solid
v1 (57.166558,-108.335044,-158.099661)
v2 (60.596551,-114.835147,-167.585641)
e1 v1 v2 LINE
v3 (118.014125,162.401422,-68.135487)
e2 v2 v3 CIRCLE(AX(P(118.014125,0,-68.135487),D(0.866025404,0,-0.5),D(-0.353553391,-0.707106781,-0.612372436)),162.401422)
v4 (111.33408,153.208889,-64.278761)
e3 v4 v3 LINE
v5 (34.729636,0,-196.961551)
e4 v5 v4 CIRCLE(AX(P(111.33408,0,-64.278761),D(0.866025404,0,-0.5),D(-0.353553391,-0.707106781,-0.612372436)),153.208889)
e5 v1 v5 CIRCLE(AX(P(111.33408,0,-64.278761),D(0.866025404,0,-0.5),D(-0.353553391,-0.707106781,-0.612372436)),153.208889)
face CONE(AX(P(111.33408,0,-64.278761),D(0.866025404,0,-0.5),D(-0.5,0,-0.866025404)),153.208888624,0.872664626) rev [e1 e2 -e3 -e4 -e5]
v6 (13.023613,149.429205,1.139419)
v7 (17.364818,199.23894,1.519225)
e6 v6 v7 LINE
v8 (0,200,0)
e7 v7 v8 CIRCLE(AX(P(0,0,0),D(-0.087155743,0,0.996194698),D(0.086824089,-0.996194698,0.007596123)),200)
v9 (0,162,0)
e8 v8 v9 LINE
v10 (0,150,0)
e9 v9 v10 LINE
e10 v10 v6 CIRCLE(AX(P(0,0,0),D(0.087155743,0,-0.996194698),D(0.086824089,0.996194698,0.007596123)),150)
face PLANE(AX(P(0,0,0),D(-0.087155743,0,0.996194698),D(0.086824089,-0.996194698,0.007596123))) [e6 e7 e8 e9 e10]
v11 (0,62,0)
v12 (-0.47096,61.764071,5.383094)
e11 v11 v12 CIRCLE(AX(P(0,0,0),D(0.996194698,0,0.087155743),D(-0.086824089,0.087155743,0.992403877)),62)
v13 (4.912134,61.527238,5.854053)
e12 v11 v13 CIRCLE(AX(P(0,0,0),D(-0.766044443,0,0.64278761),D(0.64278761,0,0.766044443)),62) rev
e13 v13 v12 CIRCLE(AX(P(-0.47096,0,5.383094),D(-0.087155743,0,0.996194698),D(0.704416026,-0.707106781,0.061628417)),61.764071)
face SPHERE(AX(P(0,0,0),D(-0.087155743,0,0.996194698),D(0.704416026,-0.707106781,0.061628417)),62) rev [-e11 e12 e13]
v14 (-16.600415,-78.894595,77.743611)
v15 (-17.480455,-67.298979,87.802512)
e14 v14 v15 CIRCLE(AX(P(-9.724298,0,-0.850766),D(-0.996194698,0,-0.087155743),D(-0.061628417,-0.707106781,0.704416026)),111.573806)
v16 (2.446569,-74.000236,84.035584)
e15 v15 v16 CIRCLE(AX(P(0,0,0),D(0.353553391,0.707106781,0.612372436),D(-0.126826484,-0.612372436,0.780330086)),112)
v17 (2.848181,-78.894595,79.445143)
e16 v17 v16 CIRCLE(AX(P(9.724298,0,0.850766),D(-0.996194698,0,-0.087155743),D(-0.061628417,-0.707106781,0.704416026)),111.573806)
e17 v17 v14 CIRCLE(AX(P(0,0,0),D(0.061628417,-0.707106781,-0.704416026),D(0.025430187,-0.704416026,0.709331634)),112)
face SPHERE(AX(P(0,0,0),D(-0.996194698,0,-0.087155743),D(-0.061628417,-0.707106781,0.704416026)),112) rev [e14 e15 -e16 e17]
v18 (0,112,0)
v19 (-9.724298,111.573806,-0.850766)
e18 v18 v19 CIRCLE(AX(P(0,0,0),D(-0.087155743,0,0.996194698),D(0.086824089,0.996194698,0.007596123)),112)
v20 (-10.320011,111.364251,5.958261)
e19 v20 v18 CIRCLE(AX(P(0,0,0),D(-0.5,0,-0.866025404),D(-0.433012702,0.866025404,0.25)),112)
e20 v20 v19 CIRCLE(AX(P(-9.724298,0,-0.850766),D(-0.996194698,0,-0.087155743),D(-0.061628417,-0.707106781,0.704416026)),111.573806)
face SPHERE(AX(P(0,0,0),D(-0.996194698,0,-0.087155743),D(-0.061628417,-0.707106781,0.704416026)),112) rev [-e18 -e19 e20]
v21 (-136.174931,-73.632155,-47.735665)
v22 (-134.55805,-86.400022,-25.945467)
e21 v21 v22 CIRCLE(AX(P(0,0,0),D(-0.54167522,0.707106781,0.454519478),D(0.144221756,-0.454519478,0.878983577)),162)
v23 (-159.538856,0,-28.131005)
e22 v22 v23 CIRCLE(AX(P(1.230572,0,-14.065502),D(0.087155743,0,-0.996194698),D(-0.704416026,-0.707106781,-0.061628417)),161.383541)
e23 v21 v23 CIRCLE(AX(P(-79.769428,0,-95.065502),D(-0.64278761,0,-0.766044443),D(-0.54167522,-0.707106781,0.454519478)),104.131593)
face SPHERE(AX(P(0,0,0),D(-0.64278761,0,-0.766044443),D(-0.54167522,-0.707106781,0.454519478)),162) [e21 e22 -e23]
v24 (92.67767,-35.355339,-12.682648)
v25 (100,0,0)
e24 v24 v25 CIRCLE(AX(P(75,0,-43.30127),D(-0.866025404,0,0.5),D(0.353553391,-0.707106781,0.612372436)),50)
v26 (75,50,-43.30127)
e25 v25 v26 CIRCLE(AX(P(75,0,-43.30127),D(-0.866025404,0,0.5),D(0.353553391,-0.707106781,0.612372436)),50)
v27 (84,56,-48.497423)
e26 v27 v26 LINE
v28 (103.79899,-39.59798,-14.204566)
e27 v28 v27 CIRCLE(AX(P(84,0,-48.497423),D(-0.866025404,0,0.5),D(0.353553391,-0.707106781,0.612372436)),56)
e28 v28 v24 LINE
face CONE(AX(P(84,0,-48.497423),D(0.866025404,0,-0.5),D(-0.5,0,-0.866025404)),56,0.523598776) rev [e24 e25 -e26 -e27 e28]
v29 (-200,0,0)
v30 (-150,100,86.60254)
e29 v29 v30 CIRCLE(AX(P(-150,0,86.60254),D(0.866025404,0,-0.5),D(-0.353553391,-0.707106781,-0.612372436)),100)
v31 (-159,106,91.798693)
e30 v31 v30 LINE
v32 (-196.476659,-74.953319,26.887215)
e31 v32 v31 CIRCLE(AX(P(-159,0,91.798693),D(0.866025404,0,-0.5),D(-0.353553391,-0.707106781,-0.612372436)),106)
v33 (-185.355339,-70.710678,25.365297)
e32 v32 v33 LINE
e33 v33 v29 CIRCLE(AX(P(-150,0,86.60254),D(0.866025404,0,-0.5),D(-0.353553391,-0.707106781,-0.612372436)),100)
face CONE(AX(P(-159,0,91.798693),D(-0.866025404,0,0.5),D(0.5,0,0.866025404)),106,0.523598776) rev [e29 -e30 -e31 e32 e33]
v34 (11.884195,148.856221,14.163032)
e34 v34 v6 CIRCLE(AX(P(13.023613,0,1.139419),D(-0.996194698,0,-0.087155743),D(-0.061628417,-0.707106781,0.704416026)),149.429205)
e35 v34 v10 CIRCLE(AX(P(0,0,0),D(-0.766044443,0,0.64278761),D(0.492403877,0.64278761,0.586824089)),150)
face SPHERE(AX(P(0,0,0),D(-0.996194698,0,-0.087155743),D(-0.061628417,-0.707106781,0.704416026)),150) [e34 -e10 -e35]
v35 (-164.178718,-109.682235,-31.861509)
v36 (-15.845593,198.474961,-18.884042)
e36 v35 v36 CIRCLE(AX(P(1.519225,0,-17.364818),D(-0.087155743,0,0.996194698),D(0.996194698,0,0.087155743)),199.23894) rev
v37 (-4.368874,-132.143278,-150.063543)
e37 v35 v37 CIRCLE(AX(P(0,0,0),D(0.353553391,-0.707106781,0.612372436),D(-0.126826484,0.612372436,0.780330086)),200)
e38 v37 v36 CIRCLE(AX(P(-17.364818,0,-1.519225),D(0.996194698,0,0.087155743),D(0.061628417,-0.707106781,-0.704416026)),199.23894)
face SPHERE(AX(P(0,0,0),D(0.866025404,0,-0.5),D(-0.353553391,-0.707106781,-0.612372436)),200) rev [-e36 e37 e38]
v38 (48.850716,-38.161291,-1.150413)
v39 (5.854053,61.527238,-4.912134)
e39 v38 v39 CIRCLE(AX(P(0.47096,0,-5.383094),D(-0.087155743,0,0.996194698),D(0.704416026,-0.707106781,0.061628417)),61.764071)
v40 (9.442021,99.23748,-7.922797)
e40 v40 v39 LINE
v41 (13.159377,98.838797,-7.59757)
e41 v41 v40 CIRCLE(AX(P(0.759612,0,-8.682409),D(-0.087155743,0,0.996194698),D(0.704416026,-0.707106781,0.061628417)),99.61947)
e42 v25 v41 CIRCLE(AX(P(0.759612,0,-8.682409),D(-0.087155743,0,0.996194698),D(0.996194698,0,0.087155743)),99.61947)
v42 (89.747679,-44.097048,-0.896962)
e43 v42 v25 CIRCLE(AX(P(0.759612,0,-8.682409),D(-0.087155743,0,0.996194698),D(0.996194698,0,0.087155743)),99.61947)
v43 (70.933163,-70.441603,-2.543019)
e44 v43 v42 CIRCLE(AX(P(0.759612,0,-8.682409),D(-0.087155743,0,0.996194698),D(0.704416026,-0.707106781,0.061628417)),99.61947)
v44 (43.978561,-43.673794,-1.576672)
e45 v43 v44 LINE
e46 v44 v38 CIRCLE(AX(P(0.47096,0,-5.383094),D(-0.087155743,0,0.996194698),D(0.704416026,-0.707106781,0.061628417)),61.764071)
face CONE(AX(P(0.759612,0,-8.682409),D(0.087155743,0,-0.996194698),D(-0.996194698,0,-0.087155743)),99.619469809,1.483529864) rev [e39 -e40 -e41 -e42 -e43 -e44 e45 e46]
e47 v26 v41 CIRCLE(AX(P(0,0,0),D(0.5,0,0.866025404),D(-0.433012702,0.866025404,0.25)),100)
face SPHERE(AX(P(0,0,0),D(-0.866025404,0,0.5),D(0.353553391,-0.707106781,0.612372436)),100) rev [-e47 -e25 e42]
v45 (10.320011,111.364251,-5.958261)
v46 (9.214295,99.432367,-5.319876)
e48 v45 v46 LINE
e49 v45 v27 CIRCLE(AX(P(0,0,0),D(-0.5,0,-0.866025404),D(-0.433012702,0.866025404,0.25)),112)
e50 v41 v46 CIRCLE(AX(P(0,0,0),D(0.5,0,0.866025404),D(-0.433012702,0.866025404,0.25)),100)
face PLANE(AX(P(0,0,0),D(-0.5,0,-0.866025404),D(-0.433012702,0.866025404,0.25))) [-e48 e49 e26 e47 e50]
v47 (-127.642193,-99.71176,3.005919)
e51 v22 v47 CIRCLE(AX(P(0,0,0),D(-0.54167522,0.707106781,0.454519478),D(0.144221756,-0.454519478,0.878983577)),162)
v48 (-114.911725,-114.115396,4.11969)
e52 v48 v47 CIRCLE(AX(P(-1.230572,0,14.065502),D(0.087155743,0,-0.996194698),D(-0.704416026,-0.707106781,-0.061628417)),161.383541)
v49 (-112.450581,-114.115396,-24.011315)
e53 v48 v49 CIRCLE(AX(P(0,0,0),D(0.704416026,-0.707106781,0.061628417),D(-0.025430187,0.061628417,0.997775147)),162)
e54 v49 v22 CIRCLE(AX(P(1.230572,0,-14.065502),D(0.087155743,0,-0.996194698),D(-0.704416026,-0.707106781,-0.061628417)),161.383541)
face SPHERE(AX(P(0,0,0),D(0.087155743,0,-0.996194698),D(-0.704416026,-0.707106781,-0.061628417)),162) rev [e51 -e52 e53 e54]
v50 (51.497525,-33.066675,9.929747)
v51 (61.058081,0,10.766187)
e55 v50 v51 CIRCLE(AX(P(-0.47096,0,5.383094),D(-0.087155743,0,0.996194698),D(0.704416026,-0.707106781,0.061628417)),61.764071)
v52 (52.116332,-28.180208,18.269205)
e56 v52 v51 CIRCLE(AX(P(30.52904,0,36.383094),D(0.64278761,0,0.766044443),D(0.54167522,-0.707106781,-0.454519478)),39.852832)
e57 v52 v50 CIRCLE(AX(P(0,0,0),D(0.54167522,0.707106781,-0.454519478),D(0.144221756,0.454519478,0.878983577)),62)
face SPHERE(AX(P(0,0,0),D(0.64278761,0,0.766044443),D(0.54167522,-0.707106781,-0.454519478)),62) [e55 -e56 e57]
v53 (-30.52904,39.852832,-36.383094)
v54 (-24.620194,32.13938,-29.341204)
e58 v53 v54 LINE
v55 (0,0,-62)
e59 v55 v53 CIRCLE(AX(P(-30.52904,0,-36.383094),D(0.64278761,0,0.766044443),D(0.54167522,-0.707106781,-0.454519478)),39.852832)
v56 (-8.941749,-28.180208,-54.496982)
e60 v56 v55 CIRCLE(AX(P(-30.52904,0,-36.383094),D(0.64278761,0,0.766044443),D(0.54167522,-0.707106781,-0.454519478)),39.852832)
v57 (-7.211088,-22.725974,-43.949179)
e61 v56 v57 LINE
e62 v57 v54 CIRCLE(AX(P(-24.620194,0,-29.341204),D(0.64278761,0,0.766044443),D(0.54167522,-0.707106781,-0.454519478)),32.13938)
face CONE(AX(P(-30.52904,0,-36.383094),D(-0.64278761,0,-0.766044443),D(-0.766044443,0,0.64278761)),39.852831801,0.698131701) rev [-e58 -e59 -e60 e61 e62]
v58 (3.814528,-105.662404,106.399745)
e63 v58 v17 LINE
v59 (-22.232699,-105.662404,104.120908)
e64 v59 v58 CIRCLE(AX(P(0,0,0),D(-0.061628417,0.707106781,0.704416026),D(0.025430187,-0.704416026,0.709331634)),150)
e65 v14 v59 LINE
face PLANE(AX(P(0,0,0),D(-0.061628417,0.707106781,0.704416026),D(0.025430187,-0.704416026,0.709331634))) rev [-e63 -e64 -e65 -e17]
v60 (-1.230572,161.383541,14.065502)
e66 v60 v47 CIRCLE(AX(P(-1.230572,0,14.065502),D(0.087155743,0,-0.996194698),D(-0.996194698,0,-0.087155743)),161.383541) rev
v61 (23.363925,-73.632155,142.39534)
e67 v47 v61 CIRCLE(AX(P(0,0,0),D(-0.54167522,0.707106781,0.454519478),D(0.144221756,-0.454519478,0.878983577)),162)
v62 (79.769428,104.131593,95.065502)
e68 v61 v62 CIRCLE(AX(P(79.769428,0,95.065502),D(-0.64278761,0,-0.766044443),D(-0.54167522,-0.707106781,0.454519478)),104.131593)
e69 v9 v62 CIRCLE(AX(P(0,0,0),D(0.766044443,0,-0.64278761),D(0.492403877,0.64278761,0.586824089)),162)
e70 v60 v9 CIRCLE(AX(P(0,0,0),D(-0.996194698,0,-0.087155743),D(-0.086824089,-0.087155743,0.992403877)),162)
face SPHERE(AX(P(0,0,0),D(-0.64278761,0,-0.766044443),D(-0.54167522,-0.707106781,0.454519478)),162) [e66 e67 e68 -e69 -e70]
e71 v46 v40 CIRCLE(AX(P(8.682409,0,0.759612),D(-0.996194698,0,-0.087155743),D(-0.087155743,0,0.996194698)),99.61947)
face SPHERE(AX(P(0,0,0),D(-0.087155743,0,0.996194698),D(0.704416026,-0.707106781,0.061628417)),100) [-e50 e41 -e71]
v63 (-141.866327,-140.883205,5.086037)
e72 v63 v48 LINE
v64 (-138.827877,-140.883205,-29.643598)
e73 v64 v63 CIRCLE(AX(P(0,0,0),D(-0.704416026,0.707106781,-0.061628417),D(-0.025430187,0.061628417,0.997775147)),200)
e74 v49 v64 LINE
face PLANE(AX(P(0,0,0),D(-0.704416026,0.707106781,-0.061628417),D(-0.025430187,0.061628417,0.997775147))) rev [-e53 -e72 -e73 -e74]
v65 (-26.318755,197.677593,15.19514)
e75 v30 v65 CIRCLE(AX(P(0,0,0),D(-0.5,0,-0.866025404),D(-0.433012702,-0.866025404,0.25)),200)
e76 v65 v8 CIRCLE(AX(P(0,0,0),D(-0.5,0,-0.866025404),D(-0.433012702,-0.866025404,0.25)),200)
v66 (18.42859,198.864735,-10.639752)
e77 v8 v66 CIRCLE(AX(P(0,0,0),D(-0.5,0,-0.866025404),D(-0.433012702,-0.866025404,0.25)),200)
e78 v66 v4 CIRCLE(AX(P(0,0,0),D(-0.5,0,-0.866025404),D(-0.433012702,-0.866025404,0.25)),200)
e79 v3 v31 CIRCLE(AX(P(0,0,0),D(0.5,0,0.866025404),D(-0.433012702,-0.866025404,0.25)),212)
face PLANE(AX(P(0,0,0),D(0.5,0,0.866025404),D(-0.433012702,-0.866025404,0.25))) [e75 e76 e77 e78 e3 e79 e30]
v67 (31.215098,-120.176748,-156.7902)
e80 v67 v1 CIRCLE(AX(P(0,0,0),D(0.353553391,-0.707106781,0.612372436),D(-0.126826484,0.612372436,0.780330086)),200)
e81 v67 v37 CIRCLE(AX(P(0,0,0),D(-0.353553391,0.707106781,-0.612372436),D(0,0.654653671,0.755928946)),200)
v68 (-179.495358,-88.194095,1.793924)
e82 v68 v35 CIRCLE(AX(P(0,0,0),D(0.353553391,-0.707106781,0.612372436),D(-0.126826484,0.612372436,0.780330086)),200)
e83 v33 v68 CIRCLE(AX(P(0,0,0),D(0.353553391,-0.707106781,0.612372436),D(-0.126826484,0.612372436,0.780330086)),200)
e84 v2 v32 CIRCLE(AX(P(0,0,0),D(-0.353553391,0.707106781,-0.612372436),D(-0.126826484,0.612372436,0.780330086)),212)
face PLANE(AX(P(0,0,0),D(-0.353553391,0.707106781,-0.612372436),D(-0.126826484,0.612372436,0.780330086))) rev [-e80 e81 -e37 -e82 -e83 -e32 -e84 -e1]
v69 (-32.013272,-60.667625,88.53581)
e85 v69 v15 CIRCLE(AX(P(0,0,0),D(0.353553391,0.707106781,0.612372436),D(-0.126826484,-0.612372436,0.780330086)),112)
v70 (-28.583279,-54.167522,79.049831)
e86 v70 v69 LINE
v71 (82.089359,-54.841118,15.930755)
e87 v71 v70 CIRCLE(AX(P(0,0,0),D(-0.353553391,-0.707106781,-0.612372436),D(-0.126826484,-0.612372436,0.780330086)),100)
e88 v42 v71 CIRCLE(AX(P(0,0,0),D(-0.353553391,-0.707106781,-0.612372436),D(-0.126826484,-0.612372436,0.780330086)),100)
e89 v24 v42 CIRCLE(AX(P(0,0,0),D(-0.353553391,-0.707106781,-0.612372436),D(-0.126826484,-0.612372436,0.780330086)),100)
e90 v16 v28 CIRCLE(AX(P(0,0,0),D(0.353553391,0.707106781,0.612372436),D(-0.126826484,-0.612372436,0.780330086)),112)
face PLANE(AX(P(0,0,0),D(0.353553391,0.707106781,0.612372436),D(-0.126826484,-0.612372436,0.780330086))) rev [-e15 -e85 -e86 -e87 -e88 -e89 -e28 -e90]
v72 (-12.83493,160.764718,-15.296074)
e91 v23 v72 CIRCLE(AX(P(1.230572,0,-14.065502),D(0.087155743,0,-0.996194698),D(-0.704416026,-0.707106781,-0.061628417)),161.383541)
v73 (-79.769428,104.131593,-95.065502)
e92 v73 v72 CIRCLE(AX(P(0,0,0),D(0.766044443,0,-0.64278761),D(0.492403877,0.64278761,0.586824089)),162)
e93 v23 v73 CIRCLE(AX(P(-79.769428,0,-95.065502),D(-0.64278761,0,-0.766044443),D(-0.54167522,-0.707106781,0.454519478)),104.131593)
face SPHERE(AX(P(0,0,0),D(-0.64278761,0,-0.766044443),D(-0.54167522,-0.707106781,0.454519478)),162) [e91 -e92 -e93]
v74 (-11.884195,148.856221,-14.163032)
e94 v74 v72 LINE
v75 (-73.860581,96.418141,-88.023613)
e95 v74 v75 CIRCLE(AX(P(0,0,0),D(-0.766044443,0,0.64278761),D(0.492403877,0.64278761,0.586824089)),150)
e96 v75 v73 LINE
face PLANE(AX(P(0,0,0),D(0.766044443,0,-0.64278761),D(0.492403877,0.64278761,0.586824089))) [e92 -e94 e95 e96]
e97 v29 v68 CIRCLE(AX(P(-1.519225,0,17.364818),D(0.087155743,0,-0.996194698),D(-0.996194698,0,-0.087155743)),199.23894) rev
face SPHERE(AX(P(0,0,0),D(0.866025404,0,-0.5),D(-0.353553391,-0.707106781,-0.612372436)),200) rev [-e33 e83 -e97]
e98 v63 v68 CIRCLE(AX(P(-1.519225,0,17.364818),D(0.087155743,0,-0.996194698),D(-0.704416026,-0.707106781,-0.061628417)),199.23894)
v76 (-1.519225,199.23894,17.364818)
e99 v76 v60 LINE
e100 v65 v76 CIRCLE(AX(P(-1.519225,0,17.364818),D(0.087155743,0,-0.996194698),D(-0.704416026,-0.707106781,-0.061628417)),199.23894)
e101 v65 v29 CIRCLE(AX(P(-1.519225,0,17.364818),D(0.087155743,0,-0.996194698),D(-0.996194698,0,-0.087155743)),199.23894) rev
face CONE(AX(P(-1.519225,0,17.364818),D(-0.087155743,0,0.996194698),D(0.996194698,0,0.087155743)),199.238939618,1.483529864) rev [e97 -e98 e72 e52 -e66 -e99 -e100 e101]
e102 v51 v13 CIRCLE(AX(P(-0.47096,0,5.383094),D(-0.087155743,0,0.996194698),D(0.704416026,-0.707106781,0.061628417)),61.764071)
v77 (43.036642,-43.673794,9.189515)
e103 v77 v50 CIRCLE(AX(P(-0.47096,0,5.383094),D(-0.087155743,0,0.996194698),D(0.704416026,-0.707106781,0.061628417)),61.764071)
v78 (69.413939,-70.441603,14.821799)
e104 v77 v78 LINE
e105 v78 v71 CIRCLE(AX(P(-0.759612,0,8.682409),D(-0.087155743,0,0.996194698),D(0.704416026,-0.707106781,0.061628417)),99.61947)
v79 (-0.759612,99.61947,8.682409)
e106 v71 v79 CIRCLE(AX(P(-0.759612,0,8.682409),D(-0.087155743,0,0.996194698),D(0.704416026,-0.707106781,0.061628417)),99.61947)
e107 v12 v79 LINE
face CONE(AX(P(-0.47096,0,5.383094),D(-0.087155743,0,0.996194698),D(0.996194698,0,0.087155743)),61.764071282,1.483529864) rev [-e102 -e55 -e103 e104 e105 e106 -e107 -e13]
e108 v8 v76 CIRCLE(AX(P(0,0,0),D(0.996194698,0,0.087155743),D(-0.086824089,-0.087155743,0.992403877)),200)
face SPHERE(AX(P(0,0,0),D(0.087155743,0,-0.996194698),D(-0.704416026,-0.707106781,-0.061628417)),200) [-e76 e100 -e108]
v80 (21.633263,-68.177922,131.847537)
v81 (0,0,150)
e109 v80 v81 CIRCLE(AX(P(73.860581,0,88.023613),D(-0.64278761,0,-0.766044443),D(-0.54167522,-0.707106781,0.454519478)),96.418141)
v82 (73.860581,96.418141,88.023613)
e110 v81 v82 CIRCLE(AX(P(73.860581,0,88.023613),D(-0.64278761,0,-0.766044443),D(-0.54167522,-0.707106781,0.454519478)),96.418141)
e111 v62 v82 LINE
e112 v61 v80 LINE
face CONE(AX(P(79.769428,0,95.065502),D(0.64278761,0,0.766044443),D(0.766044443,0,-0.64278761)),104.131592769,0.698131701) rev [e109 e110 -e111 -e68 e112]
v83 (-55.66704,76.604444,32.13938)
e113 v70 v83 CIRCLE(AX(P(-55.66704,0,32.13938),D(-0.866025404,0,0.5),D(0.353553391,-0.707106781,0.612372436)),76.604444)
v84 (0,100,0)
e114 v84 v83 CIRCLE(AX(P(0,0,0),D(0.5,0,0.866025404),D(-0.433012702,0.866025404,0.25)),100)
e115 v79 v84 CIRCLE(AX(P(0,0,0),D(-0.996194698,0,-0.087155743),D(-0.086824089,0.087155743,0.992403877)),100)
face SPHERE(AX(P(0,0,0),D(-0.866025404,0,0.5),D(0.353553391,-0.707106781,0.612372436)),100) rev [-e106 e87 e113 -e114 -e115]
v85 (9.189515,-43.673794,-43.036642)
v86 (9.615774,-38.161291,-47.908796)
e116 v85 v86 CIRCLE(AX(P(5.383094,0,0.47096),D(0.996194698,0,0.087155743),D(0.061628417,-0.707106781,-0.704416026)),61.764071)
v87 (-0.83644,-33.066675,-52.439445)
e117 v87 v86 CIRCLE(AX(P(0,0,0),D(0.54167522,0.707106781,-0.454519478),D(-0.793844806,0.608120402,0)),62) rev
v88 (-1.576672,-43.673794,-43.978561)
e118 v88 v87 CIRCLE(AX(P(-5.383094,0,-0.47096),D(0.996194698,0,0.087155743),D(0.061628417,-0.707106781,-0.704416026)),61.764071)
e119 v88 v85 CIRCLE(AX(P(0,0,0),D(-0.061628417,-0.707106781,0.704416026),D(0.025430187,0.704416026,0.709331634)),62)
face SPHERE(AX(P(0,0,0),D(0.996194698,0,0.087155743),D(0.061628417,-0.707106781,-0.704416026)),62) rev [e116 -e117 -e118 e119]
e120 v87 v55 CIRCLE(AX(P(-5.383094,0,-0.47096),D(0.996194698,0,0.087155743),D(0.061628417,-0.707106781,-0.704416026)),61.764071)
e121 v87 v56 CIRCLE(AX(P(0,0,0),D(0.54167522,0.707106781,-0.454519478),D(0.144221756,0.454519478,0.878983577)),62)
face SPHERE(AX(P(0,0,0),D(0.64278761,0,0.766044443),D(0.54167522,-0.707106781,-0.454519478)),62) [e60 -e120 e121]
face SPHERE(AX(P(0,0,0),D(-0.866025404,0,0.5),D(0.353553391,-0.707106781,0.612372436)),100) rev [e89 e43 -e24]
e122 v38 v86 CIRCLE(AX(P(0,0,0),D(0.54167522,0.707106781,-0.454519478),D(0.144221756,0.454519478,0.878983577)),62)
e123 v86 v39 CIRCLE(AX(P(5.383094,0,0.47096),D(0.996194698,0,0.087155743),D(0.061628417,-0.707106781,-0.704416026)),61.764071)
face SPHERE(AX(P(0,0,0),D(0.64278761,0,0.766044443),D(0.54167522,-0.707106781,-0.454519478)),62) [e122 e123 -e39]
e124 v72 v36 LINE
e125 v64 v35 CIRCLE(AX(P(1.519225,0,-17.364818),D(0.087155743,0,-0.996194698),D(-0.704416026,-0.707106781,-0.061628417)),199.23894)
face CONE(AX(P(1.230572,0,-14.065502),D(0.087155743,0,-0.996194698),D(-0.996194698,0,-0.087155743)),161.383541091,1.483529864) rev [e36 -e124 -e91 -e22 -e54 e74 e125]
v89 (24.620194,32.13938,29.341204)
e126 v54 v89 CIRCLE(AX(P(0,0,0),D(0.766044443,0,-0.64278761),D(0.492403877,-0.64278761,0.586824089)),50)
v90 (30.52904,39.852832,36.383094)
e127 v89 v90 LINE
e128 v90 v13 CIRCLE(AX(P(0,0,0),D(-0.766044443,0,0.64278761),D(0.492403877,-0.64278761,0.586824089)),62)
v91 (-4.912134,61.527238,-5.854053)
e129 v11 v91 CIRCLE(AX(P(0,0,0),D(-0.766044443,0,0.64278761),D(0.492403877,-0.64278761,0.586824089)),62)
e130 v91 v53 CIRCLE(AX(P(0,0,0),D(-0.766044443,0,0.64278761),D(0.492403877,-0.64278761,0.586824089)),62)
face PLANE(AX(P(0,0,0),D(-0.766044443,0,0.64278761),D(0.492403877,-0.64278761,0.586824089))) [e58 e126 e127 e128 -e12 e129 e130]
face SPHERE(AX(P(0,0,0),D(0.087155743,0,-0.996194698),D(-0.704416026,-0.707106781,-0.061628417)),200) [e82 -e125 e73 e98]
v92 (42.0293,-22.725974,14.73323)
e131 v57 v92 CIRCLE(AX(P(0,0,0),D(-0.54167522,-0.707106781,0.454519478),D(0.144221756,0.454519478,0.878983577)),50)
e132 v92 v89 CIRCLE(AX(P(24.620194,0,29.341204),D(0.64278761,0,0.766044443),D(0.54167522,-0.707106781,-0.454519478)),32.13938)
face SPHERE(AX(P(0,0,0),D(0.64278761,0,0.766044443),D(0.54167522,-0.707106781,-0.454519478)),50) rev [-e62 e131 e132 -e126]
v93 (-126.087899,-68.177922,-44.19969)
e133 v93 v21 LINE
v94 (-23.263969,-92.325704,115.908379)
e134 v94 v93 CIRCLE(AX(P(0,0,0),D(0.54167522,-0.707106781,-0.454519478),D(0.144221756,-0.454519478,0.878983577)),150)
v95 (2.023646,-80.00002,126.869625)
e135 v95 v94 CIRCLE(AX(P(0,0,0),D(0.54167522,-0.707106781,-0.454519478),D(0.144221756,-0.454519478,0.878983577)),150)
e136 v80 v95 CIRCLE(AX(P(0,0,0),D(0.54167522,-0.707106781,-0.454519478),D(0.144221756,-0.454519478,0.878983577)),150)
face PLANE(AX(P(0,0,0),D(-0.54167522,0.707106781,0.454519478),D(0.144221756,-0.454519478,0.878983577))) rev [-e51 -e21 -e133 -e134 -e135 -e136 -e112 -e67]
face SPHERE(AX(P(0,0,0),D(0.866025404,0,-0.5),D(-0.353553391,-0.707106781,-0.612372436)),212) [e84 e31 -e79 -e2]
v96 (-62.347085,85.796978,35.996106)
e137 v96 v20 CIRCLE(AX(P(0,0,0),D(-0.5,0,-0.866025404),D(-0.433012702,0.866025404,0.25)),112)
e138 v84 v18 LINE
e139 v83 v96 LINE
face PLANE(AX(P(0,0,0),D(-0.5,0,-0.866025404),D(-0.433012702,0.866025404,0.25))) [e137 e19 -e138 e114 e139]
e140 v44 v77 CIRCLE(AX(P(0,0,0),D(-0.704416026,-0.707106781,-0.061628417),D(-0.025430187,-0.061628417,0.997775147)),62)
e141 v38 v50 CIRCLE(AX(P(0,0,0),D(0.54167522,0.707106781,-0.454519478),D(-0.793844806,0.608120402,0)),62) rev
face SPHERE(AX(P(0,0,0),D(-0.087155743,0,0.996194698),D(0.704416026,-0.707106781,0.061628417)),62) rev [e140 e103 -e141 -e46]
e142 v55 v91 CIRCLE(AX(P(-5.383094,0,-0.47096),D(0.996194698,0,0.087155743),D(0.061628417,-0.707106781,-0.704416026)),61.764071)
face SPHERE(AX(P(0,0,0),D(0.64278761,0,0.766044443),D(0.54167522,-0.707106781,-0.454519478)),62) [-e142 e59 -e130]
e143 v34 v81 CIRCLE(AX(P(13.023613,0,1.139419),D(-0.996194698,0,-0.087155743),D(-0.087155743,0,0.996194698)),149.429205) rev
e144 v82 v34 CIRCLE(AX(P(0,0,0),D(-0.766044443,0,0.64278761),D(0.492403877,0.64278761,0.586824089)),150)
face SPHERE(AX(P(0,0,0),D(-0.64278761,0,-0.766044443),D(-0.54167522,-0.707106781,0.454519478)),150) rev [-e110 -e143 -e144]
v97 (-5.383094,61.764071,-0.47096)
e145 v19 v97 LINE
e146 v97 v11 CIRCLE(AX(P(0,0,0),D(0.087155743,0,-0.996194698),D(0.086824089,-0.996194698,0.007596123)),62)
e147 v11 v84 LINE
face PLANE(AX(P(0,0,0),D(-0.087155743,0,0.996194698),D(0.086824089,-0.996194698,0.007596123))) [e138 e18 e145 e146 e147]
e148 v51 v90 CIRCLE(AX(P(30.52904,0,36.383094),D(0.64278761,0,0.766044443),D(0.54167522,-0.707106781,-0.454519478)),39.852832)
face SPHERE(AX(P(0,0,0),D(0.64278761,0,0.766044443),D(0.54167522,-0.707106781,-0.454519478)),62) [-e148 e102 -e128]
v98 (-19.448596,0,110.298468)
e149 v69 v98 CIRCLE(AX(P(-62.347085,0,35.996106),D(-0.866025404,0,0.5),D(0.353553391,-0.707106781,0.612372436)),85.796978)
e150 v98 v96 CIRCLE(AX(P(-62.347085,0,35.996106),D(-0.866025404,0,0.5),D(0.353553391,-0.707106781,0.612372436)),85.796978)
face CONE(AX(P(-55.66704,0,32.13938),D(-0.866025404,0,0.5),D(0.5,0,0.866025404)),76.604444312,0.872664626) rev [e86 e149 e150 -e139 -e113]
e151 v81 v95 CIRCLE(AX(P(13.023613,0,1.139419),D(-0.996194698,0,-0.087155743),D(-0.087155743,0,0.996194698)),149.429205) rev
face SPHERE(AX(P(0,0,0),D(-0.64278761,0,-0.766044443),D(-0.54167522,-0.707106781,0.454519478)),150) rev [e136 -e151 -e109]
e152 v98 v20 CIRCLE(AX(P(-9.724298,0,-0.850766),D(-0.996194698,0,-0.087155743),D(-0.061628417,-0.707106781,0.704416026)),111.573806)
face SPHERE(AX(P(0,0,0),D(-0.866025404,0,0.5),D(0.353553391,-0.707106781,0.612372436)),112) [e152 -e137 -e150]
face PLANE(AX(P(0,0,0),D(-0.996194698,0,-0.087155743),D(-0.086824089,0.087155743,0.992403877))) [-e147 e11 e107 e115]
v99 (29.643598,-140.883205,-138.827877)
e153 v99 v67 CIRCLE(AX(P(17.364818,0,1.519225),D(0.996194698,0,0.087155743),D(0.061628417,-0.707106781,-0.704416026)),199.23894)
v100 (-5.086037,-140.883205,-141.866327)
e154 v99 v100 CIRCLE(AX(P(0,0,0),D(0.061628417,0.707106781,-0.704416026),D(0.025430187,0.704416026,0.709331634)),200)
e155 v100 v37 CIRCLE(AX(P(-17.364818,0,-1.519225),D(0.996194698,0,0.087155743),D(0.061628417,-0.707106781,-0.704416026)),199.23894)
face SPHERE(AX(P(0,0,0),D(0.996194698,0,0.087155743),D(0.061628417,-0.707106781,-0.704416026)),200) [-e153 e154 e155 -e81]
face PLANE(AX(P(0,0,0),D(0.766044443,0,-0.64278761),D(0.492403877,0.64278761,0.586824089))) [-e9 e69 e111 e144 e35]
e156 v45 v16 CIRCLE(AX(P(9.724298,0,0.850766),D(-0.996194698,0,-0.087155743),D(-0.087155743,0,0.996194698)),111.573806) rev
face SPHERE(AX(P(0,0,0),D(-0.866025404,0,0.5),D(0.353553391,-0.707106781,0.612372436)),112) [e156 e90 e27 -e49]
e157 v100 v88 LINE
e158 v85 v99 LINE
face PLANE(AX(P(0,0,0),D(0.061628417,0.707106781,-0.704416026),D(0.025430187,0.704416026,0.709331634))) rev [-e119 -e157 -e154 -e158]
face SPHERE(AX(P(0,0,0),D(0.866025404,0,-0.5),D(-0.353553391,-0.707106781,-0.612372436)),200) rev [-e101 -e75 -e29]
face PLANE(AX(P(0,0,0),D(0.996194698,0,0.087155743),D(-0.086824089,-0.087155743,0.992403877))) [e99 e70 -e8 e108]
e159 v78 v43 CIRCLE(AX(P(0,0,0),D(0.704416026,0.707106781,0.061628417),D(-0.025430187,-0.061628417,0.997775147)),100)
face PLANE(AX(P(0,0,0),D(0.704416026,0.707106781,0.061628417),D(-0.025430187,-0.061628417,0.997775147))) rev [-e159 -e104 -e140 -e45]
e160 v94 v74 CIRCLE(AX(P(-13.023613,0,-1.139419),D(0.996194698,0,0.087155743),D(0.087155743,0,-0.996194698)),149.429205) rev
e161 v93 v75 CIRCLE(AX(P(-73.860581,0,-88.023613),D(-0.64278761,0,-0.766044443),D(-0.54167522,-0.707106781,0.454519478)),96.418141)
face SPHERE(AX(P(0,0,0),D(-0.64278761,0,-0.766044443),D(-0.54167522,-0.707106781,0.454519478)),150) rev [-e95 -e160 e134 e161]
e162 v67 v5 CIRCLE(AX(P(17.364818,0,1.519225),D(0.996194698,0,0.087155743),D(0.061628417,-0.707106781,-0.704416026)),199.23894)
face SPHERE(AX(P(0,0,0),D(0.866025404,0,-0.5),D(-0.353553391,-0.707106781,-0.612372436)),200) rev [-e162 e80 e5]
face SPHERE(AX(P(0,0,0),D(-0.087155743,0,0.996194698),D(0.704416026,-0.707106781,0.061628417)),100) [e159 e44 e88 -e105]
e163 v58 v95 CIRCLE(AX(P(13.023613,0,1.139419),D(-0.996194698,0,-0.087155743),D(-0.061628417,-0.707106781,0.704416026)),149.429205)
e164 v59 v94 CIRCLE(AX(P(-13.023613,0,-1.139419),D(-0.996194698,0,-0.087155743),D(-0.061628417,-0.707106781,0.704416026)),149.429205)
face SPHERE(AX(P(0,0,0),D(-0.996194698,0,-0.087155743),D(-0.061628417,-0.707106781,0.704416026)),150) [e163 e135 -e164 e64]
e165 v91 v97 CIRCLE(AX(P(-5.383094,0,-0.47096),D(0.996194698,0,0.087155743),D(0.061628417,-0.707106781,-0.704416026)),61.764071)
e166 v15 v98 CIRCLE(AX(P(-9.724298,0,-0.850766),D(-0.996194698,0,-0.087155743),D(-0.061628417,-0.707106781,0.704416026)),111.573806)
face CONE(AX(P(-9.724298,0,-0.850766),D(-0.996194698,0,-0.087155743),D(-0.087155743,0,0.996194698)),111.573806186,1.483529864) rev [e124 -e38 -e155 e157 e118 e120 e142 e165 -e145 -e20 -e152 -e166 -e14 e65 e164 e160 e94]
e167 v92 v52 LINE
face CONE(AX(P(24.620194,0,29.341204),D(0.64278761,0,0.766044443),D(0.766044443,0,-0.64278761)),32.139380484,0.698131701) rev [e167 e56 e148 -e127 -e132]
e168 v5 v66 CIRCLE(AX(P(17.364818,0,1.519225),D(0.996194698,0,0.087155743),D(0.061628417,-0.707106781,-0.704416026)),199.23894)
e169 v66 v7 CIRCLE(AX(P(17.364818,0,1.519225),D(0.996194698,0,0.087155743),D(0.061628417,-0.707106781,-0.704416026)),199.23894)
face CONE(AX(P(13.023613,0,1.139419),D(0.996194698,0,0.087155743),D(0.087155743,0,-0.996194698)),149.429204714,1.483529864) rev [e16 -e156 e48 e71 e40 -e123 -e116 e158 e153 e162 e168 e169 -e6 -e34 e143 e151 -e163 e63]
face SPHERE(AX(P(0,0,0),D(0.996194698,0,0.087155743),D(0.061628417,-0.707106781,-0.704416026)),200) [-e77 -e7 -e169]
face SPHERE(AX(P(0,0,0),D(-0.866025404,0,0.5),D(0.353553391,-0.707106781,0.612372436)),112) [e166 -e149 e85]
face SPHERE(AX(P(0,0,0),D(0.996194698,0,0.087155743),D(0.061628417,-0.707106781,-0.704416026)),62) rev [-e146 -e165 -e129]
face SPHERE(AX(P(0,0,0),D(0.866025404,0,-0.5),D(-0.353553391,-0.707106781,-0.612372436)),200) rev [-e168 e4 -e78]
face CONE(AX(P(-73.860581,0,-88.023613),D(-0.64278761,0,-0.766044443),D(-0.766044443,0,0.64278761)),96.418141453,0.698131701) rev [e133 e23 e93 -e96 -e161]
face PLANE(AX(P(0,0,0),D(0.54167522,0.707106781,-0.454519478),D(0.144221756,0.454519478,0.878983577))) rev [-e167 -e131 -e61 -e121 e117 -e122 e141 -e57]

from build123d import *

# Parameters (mm, degrees)
SWEEP2_ANGLE = 135


# Read off the part's stored shape, not the designer's step: Sweep2
with BuildPart() as part:
    # Sweep2 outline → Sweep2 (revolve)
    with BuildSketch(Plane(origin=(0, 0, 0), x_dir=(0.5416752204196997, -0.707106781186551, -0.4545194776720406), z_dir=(-0.5416752204197053, -0.7071067811865439, 0.4545194776720451))):
        with BuildLine():
            Line((32.139380484, -38.302222156), (39.852831801, -47.494755473))
            ThreePointArc((39.852831801, -47.494755473), (62, 0), (39.852831801, 47.494755473))
            Line((39.852831801, 47.494755473), (32.139380484, 38.302222156))
            ThreePointArc((32.139380484, 38.302222156), (50, 0), (32.139380484, -38.302222156))
        make_face()
    revolve(axis=Axis((0, 0, 0), (0.6427876096865381, 0, 0.7660444431189789)), revolution_arc=SWEEP2_ANGLE)



with BuildPart() as body_2:
    # Sweep3: sweep along a path in Sketch15
    with BuildLine(Plane(origin=(0, 0, 0), x_dir=(-0.49999999999999506, 0, -0.8660254037844415), z_dir=(0.8660254037844415, 0, -0.49999999999999506))) as sweep3_path:
        ThreePointArc((0, 106.00000000000001), (-97.93123044619651, 40.56444383069927), (-74.95331880577362, -74.95331880577444))
    # Sketch2 → Sweep3 (sweep)
    with BuildSketch(Plane(origin=(0, 0, 0), x_dir=(1, 0, 0), z_dir=(0, 1, 0))):
        with BuildLine():
            Line((100, -3.4668e-13), (112, -3.9105e-13))
            ThreePointArc((112, -3.9105e-13), (71.99221228489193, -85.79697762932594), (-19.448595898696997, -110.29846833736717))
            Line((-19.448595898696997, -110.29846833736717), (-17.364817766693747, -98.48077530122067))
            ThreePointArc((-17.364817766693747, -98.48077530122067), (64.27876096865351, -76.60444431189816), (100, -3.4668e-13))
        make_face()
    sweep(path=sweep3_path.line)


with BuildPart() as body_3:
    # Sweep4: sweep along a path in Sketch16
    with BuildLine(Plane(origin=(0, 0, 0), x_dir=(0.7660444431189743, 0, -0.6427876096865438), z_dir=(0.6427876096865438, 0, 0.7660444431189745))) as sweep4_path:
        ThreePointArc((0, 156), (-144.12520707176088, 59.69861544895363), (-110.3086578651008, -110.308657865102))
    # Sketch3 → Sweep4 (sweep)
    with BuildSketch(Plane(origin=(0, 0, 0), x_dir=(1, 0, 0), z_dir=(0, 1, 0))):
        with BuildLine():
            Line((-1.04744e-12, -150), (-1.13124e-12, -162))
            ThreePointArc((-1.13124e-12, -162), (-124.09919978527539, -104.13159276921829), (-159.53885598797743, 28.13100478204443))
            Line((-159.53885598797743, 28.13100478204443), (-147.72116295183096, 26.047226650041136))
            ThreePointArc((-147.72116295183096, 26.047226650041136), (-114.90666646784759, -96.4181414529799), (-1.04744e-12, -150))
        make_face()
    sweep(path=sweep4_path.line)


with BuildPart() as body_4:
    # Sweep5: sweep along a path in Sketch17
    with BuildLine(Plane(origin=(0, 0, 0), x_dir=(0.5000000000000013, 0, 0.8660254037844379), z_dir=(-0.8660254037844378, 0, 0.5000000000000012))) as sweep5_path:
        ThreePointArc((0, 206.00000000000003), (-190.3191836973253, 78.83278706720802), (-145.663996924428, -145.66399692442957))
    # Sketch4 → Sweep5 (sweep)
    with BuildSketch(Plane(origin=(0, 0, 0), x_dir=(1, 0, 0), z_dir=(0, 1, 0))):
        with BuildLine():
            Line((-200, -7.4728e-13), (-212, -7.9212e-13))
            ThreePointArc((-212, -7.9212e-13), (-136.27097325354666, 162.40142194122313), (36.81341366538924, 208.77924363858813))
            Line((36.81341366538924, 208.77924363858813), (34.72963553338607, 196.9615506024416))
            ThreePointArc((34.72963553338607, 196.9615506024416), (-128.55752193730814, 153.2088886237954), (-200, -7.4728e-13))
        make_face()
    sweep(path=sweep5_path.line)


with BuildPart() as part_1:
    add(part.part)

    add(body_2.part)  # Sweep6 merges body 2
    # Sweep6: sweep along a path in Sketch22
    with BuildLine(Plane(origin=(0, 0, 0), x_dir=(-0.9961946980917453, 0, -0.08715574274766177), z_dir=(0.08715574274766177, 0, -0.9961946980917453))) as sweep6_path:
        ThreePointArc((0, 77.99999999999999), (-72.06260353588043, 29.849307724476812), (-55.1543289325504, -55.154328932551))
    # Sketch5 → Sweep6 (sweep)
    with BuildSketch(Plane(origin=(0, 0, 0), x_dir=(1, 0, 0), z_dir=(0, 1, 0))):
        with BuildLine():
            Line((62, -2.1647e-13), (100, -3.4915e-13))
            ThreePointArc((100, -3.4915e-13), (99.61946980917453, -8.715574274766185), (98.48077530122076, -17.364817766693417))
            Line((98.48077530122076, -17.364817766693417), (61.058080686756846, -10.766187015349916))
            ThreePointArc((61.058080686756846, -10.766187015349916), (61.76407128168819, -5.403656050355033), (62, -2.1647e-13))
        make_face()
    sweep(path=sweep6_path.line)


with BuildPart() as sweep7_tool:
    # Sweep7: sweep along a path in Sketch23
    with BuildLine(Plane(origin=(0, 0, 0), x_dir=(0.08715574274765134, 0, -0.9961946980917462), z_dir=(0.9961946980917462, 0, 0.08715574274765134))) as sweep7_path:
        ThreePointArc((0, 128), (-118.25658016144483, 48.98347934273119), (-90.50966799187758, -90.50966799187859))
    # Sketch6 → Sweep7 (sweep)
    with BuildSketch(Plane(origin=(0, 0, 0), x_dir=(1, 0, 0), z_dir=(0, 1, 0))):
        with BuildLine():
            Line((-3.86585e-12, -112), (-5.17747e-12, -150))
            ThreePointArc((-5.17747e-12, -150), (-13.073361412153913, -149.4292047137614), (-26.047226650044717, -147.72116295183034))
            Line((-26.047226650044717, -147.72116295183034), (-19.448595898700052, -110.29846833736664))
            ThreePointArc((-19.448595898700052, -110.29846833736664), (-9.761443187741587, -111.57380618627518), (-3.86585e-12, -112))
        make_face()
    sweep(path=sweep7_path.line)


with BuildPart() as part_2:
    add(part_1.part)


with BuildPart() as part_3:
    # Sweep7: joined with sweep7_tool
    add(part_2.part.fuse(sweep7_tool.part, body_3.part, tol=0.00001))


    add(body_4.part)  # Sweep8 merges body 4
    # Sweep8: sweep along a path in Sketch24
    with BuildLine(Plane(origin=(0, 0, 0), x_dir=(0.9961946980917459, 0, 0.08715574274765439), z_dir=(-0.08715574274765439, 0, 0.996194698091746))) as sweep8_path:
        ThreePointArc((0, 178), (-164.45055678700922, 68.11765096098556), (-125.86500705120477, -125.86500705120612))
    # Sketch7 → Sweep8 (sweep)
    with BuildSketch(Plane(origin=(0, 0, 0), x_dir=(1, 0, 0), z_dir=(0, 1, 0))):
        with BuildLine():
            Line((-162, -6.053e-13), (-200, -7.4728e-13))
            ThreePointArc((-200, -7.4728e-13), (-199.23893961834912, 17.431148549531017), (-196.9615506024417, 34.72963553338542))
            Line((-196.9615506024417, 34.72963553338542), (-159.53885598797785, 28.131004782042204))
            ThreePointArc((-159.53885598797785, 28.131004782042204), (-161.38354109086288, 14.119230325120132), (-162, -6.053e-13))
        make_face()
    sweep(path=sweep8_path.line)

    # Sweep9: sweep along a path in Sketch25
    with BuildLine(Plane(origin=(0, 0, 0), x_dir=(-0.08715574274765836, 0, 0.9961946980917455), z_dir=(-0.9961946980917457, 0, -0.08715574274765837))) as sweep9_path:
        ThreePointArc((0, 128), (-118.25658016144483, 48.98347934273119), (-90.50966799187758, -90.50966799187859))
    # Sketch8 → Sweep9 (sweep)
    with BuildSketch(Plane(origin=(0, 0, 0), x_dir=(1, 0, 0), z_dir=(0, 1, 0))):
        with BuildLine():
            Line((10.766187015349702, 61.05808068675688), (34.72963553338614, 196.96155060244158))
            ThreePointArc((34.72963553338614, 196.96155060244158), (17.43114854953167, 199.2389396183491), (0, 200))
            Line((0, 200), (0, 61.99999999999999))
            ThreePointArc((0, 61.99999999999999), (5.403656050354817, 61.76407128168821), (10.766187015349702, 61.05808068675688))
        make_face()
    sweep(path=sweep9_path.line)


solid = part_3.part
